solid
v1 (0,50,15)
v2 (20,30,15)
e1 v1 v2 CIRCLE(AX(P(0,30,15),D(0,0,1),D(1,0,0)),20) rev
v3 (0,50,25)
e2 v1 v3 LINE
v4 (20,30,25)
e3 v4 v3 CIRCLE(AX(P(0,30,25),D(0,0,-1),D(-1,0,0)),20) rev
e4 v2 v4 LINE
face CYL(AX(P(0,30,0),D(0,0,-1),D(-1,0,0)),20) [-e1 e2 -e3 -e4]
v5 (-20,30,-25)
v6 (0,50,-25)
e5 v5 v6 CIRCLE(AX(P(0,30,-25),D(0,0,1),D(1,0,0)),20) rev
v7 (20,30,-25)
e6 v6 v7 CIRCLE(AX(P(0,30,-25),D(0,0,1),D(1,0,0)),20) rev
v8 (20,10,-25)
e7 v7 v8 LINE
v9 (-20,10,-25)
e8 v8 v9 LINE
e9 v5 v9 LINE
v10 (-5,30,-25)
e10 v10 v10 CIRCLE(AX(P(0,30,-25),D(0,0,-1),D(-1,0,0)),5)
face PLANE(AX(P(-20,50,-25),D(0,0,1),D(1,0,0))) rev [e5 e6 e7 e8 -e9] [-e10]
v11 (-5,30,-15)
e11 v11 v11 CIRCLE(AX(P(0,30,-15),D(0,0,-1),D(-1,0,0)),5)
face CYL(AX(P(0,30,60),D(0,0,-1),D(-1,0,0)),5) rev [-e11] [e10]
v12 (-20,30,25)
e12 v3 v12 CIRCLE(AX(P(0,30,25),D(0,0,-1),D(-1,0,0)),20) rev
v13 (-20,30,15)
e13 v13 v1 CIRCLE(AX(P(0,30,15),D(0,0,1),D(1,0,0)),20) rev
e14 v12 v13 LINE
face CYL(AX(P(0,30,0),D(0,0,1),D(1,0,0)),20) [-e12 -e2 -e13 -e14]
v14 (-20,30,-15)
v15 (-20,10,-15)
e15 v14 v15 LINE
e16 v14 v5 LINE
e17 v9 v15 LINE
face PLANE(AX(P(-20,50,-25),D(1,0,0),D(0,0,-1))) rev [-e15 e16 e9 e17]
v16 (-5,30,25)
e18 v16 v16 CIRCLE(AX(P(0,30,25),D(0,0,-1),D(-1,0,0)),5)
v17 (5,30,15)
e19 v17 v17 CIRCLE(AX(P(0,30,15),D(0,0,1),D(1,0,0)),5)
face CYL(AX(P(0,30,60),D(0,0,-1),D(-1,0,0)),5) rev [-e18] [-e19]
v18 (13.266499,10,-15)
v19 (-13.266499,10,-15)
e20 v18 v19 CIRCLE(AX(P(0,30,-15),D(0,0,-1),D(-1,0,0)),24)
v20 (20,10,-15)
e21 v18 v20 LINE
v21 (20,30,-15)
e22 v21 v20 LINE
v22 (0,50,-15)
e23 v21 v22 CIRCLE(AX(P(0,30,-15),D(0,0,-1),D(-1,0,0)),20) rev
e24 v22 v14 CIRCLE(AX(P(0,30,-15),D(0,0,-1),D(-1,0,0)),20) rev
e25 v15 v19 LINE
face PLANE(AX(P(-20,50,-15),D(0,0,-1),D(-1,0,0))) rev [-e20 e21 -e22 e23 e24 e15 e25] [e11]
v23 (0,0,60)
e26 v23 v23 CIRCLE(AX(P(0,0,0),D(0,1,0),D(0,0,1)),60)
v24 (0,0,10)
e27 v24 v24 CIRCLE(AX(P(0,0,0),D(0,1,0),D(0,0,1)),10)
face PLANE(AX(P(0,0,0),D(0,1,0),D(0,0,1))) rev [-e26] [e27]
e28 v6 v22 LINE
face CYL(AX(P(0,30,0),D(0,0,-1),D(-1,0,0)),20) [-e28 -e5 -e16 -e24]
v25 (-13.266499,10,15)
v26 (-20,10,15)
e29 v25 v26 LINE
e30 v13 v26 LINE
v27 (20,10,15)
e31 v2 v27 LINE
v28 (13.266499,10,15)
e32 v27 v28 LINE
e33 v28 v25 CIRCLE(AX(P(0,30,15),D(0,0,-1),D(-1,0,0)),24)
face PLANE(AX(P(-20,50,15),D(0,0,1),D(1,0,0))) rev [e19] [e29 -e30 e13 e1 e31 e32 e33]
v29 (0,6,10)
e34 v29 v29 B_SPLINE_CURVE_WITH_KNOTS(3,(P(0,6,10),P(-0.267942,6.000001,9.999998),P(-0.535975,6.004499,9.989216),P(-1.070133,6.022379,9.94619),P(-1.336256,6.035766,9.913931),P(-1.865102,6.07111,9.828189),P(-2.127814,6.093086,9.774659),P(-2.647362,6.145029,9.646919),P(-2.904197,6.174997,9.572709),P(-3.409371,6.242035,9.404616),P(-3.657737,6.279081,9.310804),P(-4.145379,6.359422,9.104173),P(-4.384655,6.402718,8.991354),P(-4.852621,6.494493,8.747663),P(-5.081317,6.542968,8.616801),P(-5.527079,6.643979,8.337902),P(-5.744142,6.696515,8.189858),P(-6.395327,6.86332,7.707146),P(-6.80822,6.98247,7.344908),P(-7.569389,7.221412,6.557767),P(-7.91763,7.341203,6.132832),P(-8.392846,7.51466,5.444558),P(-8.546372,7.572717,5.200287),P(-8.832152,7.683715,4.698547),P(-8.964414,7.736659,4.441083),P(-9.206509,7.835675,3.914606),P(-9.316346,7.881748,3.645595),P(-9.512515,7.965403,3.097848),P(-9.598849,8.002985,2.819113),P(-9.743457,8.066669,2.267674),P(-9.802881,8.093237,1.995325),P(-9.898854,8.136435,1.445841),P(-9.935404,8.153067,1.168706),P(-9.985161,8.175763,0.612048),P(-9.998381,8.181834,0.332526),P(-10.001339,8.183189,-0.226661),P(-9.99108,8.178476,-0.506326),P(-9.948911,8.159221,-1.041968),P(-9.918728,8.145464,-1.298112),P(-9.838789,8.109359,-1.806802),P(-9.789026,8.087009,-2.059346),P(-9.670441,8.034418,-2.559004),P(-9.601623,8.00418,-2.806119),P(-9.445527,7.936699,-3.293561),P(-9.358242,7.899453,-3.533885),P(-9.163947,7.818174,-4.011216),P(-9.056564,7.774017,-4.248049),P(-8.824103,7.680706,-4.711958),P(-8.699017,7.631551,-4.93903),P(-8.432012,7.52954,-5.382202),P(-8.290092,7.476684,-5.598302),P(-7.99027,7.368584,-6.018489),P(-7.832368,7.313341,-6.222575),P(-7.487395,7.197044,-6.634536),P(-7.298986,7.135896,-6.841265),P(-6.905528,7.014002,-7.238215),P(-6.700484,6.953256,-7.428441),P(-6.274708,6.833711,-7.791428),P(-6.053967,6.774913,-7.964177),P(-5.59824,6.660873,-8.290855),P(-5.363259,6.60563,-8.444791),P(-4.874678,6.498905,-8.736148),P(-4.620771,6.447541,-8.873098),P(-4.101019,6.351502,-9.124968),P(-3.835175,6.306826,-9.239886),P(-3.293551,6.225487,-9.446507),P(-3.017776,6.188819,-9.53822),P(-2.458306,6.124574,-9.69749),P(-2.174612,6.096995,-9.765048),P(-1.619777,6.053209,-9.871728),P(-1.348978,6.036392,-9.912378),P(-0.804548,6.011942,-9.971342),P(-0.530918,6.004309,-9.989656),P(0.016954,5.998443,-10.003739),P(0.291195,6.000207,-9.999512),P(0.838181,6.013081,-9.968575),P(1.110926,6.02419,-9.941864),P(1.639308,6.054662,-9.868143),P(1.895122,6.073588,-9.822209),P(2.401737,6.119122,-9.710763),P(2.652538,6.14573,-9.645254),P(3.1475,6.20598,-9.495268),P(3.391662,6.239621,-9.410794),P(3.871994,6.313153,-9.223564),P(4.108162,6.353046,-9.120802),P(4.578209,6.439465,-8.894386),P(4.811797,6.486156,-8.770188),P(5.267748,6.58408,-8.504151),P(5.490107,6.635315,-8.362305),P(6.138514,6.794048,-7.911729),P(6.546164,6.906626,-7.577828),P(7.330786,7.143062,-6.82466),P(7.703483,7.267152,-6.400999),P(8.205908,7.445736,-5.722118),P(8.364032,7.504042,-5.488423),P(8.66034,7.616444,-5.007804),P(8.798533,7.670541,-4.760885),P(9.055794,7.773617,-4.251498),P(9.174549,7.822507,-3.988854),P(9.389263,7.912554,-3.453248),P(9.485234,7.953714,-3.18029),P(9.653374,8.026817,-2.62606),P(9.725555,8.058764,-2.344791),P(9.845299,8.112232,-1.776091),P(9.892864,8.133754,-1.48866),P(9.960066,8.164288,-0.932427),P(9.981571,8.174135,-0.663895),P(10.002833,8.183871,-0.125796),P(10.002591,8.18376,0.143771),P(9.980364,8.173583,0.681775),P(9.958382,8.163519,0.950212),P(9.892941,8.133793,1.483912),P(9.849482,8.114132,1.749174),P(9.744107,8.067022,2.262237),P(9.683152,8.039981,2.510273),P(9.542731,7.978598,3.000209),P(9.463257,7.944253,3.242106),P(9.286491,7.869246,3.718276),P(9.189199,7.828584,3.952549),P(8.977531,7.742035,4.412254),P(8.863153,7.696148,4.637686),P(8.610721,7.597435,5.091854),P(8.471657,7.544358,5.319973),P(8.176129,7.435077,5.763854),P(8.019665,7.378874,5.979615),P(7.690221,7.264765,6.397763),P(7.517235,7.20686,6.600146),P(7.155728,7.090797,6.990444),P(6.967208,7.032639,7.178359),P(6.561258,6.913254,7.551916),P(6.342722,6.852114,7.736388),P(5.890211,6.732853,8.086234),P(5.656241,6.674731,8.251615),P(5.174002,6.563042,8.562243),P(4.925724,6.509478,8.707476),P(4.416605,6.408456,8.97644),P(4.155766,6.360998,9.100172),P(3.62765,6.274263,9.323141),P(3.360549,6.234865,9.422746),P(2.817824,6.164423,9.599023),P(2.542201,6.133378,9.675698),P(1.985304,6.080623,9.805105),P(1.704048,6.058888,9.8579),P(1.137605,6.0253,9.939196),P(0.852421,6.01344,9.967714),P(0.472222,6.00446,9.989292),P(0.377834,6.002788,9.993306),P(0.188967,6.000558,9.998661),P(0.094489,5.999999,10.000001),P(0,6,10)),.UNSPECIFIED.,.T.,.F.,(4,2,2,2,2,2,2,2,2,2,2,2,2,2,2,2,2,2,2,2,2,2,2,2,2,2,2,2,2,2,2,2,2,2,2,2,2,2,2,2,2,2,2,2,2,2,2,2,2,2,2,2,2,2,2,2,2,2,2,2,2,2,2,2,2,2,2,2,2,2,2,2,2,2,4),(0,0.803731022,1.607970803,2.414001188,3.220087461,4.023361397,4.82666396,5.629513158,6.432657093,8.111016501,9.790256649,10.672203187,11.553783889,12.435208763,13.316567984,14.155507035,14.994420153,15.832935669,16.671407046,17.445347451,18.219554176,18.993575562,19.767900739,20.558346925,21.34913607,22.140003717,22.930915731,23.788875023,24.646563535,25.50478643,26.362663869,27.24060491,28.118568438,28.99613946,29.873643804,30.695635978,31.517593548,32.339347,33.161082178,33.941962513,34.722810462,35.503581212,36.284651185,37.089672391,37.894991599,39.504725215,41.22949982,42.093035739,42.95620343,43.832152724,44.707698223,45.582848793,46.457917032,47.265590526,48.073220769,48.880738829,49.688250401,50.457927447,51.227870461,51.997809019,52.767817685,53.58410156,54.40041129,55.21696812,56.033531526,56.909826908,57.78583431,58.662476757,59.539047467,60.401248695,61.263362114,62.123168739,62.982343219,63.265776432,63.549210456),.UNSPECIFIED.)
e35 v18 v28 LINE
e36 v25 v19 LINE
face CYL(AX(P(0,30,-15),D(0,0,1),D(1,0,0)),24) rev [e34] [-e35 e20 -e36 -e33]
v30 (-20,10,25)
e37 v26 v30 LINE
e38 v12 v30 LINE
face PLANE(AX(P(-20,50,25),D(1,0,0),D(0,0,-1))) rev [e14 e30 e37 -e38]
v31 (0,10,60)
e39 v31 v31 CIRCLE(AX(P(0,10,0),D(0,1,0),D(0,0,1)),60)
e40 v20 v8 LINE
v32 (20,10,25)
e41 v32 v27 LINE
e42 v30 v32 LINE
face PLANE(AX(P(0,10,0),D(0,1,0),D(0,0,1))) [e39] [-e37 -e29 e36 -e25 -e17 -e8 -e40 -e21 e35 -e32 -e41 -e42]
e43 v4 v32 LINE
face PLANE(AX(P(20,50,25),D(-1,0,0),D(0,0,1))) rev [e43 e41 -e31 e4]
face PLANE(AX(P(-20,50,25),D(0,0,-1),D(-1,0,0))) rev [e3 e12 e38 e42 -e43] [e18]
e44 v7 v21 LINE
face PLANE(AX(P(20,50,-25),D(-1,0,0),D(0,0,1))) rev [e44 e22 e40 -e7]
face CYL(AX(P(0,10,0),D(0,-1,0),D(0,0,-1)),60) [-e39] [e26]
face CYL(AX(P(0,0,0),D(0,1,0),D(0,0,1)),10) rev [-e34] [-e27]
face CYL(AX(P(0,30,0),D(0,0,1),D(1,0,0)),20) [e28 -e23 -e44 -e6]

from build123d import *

# Parameters (mm, degrees)
SKIZZE1_R                       = 60
AUFSATZ_LINEAR_AUSTRAGEN1_DEPTH = 10
SKIZZE2_W                       = 40
SKIZZE2_H                       = 10
AUFSATZ_LINEAR_AUSTRAGEN2_DEPTH = 40
VERRUNDUNG1_R                   = 20
SKIZZE3_R                       = 5
SCHNITT_LINEAR_AUSTRAGEN1_DEPTH = 116.433963806
SKIZZE4_R                       = 10
SCHNITT_LINEAR_AUSTRAGEN2_DEPTH = 10
SKIZZE5_R                       = 24
SCHNITT_LINEAR_AUSTRAGEN3_DEPTH = 30


with BuildPart() as part:
    # Skizze1 → Aufsatz-Linear austragen1 (new body)
    with BuildSketch(Plane(origin=(0, 0, 0), x_dir=(1, 0, 0), z_dir=(0, 1, 0))):
        with Locations(Location((0, 0, 0), (0, 0, 270))):
            Circle(SKIZZE1_R)
    extrude(amount=AUFSATZ_LINEAR_AUSTRAGEN1_DEPTH)

    # Skizze2 → Aufsatz-Linear austragen2 (add)
    with BuildSketch(Plane(origin=(0, 10, 0), x_dir=(1, 0, 0), z_dir=(0, 1, 0))):
        with Locations((0, -20)):
            Rectangle(SKIZZE2_W, SKIZZE2_H)
        with Locations((0, 20)):
            Rectangle(SKIZZE2_W, SKIZZE2_H)
    extrude(amount=AUFSATZ_LINEAR_AUSTRAGEN2_DEPTH)

    # Verrundung1
    verrundung1_edges = [part.edges().sort_by_distance(p)[0] for p in [
        (20, 50, -20),
        (20, 50, 20),
        (-20, 50, 20),
        (-20, 50, -20),
    ]]
    fillet(verrundung1_edges, radius=VERRUNDUNG1_R - 0.0001)  # a hair under: the kernel refuses the full size

    # Skizze3 → Schnitt-Linear austragen1 (cut, through all)
    with BuildSketch(Plane(origin=(0, 0, -25), x_dir=(-1, 0, 0), z_dir=(0, 0, -1))):
        with Locations((0, 30)):
            Circle(SKIZZE3_R)
    extrude(amount=-SCHNITT_LINEAR_AUSTRAGEN1_DEPTH, mode=Mode.SUBTRACT)

    # Skizze4 → Schnitt-Linear austragen2 (cut)
    with BuildSketch(Plane(origin=(0, 10, 0), x_dir=(1, 0, 0), z_dir=(0, 1, 0))):
        with Locations(Location((0, 0, 0), (0, 0, 270))):
            Circle(SKIZZE4_R)
    extrude(amount=-SCHNITT_LINEAR_AUSTRAGEN2_DEPTH, mode=Mode.SUBTRACT)

    # Skizze5 → Schnitt-Linear austragen3 (cut)
    with BuildSketch(Plane(origin=(0, 0, 15), x_dir=(-1, 0, 0), z_dir=(0, 0, -1))):
        with Locations((0, 30)):
            Circle(SKIZZE5_R)
    extrude(amount=SCHNITT_LINEAR_AUSTRAGEN3_DEPTH, mode=Mode.SUBTRACT)


solid = part.part
